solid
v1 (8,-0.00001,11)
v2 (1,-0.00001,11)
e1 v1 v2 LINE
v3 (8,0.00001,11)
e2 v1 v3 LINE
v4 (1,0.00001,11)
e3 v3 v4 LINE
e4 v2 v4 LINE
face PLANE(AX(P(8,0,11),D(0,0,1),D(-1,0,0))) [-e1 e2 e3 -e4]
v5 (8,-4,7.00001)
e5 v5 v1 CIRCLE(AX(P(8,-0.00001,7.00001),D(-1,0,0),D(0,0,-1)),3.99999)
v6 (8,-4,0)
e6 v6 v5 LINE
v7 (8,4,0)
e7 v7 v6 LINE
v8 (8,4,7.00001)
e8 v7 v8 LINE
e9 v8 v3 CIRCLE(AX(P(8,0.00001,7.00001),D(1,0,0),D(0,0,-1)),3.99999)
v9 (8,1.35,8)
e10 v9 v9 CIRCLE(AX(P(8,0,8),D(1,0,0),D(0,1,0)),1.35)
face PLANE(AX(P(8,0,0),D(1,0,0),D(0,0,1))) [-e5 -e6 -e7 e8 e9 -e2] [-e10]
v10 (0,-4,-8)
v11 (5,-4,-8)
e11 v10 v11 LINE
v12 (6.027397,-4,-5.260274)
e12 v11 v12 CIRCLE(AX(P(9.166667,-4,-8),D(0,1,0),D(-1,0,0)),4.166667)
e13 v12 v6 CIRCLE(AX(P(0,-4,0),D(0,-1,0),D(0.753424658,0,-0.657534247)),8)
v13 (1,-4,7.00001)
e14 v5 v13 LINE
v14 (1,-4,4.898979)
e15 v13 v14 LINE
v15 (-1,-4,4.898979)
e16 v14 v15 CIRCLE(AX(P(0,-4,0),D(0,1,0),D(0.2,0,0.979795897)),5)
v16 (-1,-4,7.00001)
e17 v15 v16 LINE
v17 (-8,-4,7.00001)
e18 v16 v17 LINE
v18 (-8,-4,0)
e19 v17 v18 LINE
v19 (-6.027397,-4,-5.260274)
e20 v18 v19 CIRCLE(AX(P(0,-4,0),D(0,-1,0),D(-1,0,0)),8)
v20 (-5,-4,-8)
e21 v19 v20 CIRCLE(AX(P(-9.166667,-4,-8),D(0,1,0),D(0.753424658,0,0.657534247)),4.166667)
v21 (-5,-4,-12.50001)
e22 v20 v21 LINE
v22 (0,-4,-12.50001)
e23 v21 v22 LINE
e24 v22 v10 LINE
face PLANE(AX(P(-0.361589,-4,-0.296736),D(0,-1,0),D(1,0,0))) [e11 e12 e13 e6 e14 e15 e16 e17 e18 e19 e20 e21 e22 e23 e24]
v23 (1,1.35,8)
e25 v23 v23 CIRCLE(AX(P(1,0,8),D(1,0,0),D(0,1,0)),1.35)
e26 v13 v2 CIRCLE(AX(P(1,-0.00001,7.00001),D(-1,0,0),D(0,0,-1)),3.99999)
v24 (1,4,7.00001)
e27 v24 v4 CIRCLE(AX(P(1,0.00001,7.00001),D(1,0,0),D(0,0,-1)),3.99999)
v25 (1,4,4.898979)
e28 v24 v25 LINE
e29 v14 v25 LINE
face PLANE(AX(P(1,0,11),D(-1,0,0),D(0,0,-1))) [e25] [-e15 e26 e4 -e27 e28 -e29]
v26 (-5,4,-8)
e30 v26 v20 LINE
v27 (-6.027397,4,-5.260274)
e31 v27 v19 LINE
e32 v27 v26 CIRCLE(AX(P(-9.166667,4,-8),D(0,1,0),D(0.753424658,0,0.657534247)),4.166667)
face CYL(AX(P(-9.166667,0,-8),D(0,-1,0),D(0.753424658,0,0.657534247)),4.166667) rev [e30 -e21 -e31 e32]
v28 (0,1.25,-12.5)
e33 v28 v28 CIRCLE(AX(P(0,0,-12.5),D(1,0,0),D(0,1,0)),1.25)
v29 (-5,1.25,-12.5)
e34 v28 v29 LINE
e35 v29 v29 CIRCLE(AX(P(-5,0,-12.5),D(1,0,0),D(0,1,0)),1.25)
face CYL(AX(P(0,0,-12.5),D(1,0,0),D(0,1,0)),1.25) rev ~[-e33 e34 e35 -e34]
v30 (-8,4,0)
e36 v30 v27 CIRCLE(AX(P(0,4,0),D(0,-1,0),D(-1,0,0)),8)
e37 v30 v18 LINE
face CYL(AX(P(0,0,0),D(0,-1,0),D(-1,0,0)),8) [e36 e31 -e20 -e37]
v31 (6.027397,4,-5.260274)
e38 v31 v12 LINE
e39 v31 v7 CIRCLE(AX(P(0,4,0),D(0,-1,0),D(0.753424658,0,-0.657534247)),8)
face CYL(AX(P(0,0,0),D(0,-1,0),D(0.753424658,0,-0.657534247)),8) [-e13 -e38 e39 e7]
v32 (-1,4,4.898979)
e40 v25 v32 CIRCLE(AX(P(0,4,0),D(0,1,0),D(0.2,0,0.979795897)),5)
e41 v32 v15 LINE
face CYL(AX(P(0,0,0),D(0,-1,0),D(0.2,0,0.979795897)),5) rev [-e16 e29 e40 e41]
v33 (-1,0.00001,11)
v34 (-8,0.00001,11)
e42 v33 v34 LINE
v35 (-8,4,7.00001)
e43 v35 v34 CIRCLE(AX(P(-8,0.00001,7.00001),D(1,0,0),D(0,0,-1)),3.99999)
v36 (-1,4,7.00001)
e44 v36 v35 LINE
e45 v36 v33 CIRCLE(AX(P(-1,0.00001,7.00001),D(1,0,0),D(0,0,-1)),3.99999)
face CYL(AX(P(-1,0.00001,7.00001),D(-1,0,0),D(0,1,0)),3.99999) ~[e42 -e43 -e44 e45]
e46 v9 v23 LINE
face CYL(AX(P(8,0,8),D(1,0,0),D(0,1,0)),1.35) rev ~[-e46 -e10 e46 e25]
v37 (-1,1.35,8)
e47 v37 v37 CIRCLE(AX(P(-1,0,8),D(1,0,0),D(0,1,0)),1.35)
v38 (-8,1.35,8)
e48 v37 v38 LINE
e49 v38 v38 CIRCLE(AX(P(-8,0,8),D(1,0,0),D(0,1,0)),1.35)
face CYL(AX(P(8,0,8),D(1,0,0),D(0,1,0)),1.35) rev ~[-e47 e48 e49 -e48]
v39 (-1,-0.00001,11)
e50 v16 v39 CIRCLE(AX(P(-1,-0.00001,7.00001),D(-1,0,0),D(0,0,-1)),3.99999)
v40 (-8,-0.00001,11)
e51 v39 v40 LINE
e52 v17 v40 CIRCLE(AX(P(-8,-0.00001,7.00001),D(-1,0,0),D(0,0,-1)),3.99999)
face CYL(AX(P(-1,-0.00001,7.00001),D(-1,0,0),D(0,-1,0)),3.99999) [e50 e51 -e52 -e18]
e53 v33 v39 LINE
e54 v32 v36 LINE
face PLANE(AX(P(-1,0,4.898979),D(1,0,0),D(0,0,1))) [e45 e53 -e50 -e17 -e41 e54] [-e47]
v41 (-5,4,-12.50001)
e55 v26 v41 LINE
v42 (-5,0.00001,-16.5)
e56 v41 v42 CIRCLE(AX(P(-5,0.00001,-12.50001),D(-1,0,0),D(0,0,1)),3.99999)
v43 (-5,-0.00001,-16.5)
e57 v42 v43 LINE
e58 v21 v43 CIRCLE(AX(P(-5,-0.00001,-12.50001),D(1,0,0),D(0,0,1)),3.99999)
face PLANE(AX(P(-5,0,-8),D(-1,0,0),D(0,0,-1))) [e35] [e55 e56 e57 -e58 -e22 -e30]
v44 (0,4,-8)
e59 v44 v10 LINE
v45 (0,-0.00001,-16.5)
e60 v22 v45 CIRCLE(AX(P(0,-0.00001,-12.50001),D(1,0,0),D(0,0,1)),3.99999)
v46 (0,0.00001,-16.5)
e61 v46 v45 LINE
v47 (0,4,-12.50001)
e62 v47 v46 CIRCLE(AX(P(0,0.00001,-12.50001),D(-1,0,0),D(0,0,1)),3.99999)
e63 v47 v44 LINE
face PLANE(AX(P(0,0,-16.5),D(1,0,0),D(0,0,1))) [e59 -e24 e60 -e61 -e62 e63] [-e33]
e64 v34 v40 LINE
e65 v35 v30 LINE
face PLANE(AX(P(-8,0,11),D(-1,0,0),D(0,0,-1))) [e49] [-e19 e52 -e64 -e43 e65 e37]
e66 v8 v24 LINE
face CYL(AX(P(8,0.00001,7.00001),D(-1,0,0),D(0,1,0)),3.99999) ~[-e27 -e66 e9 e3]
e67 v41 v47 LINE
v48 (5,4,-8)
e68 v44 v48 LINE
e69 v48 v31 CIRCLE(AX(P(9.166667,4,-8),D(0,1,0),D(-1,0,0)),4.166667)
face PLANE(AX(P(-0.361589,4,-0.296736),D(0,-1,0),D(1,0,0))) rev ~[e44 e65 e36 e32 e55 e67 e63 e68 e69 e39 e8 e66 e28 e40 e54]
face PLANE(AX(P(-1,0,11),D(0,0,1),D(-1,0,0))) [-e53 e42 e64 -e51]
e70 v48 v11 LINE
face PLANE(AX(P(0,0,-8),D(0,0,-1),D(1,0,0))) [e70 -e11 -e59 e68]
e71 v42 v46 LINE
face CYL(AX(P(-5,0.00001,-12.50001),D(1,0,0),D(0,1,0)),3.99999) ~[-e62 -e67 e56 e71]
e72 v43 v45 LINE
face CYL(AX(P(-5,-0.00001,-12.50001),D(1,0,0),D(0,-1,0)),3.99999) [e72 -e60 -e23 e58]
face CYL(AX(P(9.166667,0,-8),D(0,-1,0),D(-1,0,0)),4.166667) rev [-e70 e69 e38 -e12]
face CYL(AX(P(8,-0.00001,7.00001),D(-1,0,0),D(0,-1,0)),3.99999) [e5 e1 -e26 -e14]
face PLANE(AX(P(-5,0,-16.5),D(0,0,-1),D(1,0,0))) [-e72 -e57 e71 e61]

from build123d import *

# Parameters (mm, degrees)
F1_DEPTH = 4
F2_R     = 1.35
F3_DEPTH = 25
F4_R     = 1.25
F5_DEPTH = 25
F6_R     = 3.99999


# Not quite as in the source:
# - a fillet or chamfer is up to 0.001 mm smaller than in the source, because OpenCascade refuses the exact size
# - a feature names something its author has since deleted; it is built from what else it names


with BuildPart() as f1:
    # F0 (on Front) → F1 (new body, symmetric)
    with BuildSketch(Plane.XZ):
        with BuildLine():
            ThreePointArc((1, 4.8989794856), (0, -5), (-1, 4.8989794856))
            Line((-1, 4.8989794856), (-1, 11))
            Line((-1, 11), (-8, 11))
            Line((-8, 11), (-8, 0))
            ThreePointArc((-8, 0), (-7.4906334206, -2.8089875327), (-6.0273972603, -5.2602739726))
            ThreePointArc((-6.0273972603, -5.2602739726), (-5.2652950935, -6.53698566), (-5, -8))
            Line((-5, -8), (-5, -16.5))
            Line((-5, -16.5), (0, -16.5))
            Line((0, -16.5), (0, -8))
            Line((0, -8), (5, -8))
            ThreePointArc((5, -8), (5.2652950935, -6.53698566), (6.0273972603, -5.2602739726))
            ThreePointArc((6.0273972603, -5.2602739726), (7.4906334206, -2.8089875327), (8, 0))
            Line((8, 0), (8, 11))
            Line((8, 11), (1, 11))
            Line((1, 11), (1, 4.8989794856))
        make_face()
    extrude(amount=F1_DEPTH, both=True)

    # F2 (on face) → F3 (cut)
    with BuildSketch(Plane.YZ.offset(8)):
        with Locations((0, 8)):
            Circle(F2_R)
    extrude(amount=-F3_DEPTH, mode=Mode.SUBTRACT)

    # F4 (on face) → F5 (cut)
    with BuildSketch(Plane.YZ):
        with Locations((0, -12.5)):
            Circle(F4_R)
    extrude(amount=-F5_DEPTH, mode=Mode.SUBTRACT)

    # F6 (radius 4 in the source; OpenCascade refuses exactly that, so slightly less here)
    f6_edges = [f1.edges().sort_by_distance(p)[0] for p in [
        (-4.5, -4, 11),
        (-4.5, 4, 11),
        (4.5, 4, 11),
        (-2.5, -4, -16.5),
        (-2.5, 4, -16.5),
        (4.5, -4, 11),
    ]]
    fillet(f6_edges, radius=F6_R)


solid = f1.part
